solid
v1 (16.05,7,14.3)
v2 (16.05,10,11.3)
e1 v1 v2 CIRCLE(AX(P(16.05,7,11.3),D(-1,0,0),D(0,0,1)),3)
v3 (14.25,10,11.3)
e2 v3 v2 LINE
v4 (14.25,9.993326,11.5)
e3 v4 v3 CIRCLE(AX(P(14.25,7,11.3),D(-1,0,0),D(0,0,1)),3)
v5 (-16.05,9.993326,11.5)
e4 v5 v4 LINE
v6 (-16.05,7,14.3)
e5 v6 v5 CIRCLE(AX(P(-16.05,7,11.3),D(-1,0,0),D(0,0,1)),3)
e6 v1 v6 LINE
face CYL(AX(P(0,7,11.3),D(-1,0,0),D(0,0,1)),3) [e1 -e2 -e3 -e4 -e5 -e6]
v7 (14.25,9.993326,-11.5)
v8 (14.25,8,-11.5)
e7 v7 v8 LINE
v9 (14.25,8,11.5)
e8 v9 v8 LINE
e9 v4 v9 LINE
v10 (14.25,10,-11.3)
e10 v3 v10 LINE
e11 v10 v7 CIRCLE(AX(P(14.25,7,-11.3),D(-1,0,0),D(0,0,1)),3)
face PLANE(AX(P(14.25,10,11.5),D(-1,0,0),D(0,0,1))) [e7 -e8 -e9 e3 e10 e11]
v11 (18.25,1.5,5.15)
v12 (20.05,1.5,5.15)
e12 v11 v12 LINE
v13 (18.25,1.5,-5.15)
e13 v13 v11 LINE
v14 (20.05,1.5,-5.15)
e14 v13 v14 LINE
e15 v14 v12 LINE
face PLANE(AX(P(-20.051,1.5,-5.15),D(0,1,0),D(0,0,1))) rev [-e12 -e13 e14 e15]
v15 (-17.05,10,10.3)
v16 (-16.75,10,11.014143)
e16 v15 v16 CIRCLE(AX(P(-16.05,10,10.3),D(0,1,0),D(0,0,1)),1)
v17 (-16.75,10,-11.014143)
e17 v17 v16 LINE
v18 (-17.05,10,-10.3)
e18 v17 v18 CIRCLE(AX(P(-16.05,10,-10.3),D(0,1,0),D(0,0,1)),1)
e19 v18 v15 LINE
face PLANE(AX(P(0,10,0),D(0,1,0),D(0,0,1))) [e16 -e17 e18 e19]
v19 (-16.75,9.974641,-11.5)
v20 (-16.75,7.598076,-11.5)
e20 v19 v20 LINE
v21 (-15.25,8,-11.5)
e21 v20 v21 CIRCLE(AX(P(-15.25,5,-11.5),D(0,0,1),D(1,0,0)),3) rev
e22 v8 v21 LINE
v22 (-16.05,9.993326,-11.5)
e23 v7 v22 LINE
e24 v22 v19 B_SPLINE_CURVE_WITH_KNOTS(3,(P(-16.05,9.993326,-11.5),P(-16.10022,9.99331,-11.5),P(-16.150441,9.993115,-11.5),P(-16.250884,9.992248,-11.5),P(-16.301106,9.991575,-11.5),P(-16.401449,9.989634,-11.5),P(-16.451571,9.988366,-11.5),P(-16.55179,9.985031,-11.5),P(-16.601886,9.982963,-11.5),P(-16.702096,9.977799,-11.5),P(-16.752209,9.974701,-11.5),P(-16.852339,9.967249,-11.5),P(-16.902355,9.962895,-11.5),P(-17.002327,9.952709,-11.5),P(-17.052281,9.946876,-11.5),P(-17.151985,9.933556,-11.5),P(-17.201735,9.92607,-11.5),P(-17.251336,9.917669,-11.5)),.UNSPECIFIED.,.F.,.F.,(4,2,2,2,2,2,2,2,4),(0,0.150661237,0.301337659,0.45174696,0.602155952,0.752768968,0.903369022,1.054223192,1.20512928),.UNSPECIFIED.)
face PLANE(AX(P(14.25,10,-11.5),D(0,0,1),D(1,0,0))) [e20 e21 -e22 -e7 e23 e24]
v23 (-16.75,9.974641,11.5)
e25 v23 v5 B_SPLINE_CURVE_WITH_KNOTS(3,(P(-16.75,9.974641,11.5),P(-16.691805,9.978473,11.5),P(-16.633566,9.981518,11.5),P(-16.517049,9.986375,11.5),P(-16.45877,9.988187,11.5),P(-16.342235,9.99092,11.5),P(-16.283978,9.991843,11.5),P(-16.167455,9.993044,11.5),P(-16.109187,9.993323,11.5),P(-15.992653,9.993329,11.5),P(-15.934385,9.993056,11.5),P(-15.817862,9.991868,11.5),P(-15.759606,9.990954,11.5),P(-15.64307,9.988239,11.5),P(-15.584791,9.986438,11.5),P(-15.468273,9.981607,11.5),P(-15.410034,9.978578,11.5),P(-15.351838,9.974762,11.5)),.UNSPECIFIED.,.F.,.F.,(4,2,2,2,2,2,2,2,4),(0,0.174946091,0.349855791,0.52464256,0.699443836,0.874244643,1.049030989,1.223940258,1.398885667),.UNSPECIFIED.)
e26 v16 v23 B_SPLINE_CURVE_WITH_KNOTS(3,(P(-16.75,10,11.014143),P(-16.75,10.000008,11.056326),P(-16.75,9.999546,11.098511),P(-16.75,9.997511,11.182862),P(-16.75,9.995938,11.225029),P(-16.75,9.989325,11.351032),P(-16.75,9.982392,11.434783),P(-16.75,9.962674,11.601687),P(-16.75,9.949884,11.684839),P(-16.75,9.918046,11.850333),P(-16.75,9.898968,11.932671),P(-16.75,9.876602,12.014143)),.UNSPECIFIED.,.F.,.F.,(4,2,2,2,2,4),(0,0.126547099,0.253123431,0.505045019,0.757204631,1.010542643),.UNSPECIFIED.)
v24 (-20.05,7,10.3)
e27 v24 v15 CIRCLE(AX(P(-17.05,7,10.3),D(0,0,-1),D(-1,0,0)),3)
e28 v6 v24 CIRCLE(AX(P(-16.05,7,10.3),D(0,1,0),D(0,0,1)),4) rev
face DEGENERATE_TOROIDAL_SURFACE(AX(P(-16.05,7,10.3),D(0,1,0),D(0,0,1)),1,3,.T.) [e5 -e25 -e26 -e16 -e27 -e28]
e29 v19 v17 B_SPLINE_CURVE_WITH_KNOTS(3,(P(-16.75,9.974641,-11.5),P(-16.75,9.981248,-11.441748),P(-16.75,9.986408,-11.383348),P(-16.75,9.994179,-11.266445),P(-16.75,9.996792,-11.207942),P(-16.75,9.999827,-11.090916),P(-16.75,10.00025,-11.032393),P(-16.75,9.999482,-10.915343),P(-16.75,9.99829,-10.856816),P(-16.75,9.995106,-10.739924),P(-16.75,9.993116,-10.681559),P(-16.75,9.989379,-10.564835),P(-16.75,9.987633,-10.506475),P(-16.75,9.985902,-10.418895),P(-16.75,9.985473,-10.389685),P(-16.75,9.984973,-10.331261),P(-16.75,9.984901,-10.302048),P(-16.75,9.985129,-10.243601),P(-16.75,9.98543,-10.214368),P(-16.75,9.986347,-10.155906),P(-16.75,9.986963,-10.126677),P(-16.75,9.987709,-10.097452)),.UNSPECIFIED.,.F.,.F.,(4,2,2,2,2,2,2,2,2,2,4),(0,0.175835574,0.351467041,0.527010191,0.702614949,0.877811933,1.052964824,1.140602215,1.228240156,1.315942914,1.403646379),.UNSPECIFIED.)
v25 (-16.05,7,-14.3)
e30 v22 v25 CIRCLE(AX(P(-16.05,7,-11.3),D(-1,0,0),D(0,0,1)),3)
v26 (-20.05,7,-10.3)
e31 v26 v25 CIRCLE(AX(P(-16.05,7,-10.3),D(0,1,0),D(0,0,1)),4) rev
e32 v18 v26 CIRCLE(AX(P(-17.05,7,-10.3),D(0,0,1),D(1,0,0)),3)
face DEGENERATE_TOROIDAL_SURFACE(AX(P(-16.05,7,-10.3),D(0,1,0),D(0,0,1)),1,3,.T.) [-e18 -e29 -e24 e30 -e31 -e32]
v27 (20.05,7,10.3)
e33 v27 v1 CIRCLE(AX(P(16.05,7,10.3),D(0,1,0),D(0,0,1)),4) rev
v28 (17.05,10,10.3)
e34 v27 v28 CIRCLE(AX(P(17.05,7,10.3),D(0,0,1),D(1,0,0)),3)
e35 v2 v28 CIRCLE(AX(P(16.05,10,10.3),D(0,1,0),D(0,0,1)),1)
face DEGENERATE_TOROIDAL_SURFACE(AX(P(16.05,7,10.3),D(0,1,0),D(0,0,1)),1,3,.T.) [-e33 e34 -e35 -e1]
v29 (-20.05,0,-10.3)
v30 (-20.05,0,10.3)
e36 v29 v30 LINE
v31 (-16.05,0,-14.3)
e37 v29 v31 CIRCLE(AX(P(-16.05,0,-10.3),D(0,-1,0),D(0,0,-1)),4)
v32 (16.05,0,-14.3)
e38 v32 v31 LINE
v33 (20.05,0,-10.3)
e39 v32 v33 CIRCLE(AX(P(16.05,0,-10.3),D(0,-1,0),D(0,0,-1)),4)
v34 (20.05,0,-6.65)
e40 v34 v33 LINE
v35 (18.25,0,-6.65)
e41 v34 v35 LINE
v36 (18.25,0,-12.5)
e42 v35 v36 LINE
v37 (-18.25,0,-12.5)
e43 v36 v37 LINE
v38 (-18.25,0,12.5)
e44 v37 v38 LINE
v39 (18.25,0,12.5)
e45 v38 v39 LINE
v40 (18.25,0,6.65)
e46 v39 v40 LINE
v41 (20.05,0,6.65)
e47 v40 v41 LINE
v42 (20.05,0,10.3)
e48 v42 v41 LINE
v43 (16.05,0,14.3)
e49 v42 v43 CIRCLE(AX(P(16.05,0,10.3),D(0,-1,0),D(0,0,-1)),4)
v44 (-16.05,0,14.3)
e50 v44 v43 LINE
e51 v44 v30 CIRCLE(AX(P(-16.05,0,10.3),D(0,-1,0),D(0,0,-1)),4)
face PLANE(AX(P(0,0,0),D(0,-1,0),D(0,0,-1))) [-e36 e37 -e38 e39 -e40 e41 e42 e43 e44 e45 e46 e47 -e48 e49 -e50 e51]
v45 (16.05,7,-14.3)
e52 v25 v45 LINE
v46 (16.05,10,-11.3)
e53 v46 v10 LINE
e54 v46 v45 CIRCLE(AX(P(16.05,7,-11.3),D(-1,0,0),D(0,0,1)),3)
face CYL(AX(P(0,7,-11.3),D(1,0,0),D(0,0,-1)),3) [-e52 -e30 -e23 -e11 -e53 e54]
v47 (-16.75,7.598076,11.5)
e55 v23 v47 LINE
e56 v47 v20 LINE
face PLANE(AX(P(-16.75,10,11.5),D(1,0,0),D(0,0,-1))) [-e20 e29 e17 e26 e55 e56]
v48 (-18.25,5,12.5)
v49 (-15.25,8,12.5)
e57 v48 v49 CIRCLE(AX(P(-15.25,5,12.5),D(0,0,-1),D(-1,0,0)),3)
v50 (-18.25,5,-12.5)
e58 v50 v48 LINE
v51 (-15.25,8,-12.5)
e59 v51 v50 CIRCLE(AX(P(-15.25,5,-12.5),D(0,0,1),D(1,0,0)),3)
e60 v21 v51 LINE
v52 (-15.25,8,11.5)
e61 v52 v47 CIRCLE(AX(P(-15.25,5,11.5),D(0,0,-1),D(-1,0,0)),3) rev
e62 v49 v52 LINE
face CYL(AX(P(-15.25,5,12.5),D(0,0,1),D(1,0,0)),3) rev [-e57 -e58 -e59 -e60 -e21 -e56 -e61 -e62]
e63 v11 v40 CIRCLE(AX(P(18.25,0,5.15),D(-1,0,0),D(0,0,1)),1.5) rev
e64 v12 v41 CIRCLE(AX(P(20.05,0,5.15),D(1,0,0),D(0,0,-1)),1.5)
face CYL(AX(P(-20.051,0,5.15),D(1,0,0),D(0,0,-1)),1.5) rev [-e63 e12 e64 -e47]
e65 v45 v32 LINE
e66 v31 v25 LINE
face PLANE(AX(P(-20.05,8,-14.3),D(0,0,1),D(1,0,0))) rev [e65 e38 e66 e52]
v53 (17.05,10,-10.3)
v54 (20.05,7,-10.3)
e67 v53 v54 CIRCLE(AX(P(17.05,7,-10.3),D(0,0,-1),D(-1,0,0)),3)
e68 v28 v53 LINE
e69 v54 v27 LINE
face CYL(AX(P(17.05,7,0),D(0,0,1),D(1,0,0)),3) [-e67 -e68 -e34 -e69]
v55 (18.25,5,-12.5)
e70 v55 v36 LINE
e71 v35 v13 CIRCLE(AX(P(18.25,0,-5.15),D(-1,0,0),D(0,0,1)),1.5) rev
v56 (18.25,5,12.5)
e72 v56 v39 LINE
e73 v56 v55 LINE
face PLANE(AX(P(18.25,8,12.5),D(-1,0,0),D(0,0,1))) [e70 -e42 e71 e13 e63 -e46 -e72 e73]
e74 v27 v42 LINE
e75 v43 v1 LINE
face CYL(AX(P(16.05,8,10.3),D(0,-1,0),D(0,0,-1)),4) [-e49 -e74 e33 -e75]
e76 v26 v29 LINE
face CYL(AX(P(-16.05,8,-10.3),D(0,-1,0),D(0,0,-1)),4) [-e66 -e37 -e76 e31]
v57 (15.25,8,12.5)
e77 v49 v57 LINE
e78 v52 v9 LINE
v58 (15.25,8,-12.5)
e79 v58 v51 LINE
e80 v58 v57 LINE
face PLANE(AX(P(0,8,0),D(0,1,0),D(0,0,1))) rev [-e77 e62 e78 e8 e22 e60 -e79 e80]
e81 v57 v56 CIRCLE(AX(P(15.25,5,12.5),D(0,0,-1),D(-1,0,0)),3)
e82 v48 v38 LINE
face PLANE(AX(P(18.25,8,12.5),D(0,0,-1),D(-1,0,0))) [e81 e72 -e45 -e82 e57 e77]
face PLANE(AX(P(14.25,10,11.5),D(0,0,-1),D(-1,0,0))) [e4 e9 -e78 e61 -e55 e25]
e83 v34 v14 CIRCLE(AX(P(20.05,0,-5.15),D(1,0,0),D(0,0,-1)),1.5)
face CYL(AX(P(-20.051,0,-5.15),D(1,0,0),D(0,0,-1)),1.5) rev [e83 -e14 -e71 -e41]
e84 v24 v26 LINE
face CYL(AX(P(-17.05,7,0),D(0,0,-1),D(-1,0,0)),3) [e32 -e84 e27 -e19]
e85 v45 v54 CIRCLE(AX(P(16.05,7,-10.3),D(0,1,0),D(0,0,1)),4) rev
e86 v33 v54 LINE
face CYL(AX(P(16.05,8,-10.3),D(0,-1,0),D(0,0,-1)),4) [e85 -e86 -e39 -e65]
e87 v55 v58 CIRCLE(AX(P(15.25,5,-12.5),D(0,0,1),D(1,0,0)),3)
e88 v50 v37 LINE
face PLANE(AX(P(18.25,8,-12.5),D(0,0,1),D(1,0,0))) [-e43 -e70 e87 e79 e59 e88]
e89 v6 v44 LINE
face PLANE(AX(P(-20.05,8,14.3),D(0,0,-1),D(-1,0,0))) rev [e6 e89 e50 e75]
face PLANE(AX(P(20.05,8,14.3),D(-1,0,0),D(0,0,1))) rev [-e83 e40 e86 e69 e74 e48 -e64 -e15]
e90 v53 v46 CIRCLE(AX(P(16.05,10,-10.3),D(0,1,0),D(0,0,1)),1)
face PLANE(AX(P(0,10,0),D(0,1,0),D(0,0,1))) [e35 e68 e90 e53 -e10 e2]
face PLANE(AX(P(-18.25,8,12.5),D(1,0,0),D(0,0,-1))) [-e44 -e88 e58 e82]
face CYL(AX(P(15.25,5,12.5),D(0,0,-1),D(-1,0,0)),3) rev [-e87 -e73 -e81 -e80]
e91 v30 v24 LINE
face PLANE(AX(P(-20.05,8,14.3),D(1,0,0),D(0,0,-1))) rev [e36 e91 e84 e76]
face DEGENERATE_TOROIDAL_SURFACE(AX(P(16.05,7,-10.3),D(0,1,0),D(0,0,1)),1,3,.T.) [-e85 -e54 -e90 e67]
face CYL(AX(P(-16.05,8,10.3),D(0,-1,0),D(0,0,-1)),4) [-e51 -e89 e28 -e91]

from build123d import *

# Parameters (mm, degrees)
SKETCH1_W           = 40.1
SKETCH1_H           = 28.6
SKETCH1_W_2         = 36.5
SKETCH1_H_2         = 25
BOSS_EXTRUDE1_DEPTH = 8
SKETCH2_W           = 40.1
SKETCH2_H           = 28.6
SKETCH2_W_2         = 31
SKETCH2_H_2         = 23
BOSS_EXTRUDE2_DEPTH = 2
FILLET1_R           = 4
FILLET4_R           = 3
FILLET5_R           = 3
CUT_EXTRUDE1_REACH  = 45.732


with BuildPart() as part:
    # Sketch1 → Boss-Extrude1 (new body)
    with BuildSketch(Plane(origin=(0, 0, 0), x_dir=(1, 0, 0), z_dir=(0, 1, 0))):
        Rectangle(SKETCH1_W, SKETCH1_H)
        Rectangle(SKETCH1_W_2, SKETCH1_H_2, mode=Mode.SUBTRACT)
    extrude(amount=BOSS_EXTRUDE1_DEPTH)

    # Sketch2 → Boss-Extrude2 (add)
    with BuildSketch(Plane(origin=(0, 8, 0), x_dir=(1, 0, 0), z_dir=(0, 1, 0))):
        Rectangle(SKETCH2_W, SKETCH2_H)
        with Locations((-1.25, 0)):
            Rectangle(SKETCH2_W_2, SKETCH2_H_2, mode=Mode.SUBTRACT)
    extrude(amount=BOSS_EXTRUDE2_DEPTH)

    # Fillet1
    fillet1_edges = [part.edges().sort_by_distance(p)[0] for p in [
        (20.05, 5, 14.3),
        (-20.05, 5, 14.3),
        (-20.05, 5, -14.3),
        (20.05, 5, -14.3),
    ]]
    fillet(fillet1_edges, radius=FILLET1_R)

    # Fillet4
    # the kernel refuses this fillet: 3 mm, written as the material it takes off along each edge
    with BuildSketch(Plane(origin=(-20.05, 10, 10.3), x_dir=(1, 0, 0), z_dir=(0, 0, -1)), Plane(origin=(20.05, 10, -10.3), x_dir=(-1, 0, 0), z_dir=(0, 0, 1))) as fillet4_piece_1:
        with BuildLine():
            CenterArc((FILLET4_R, FILLET4_R), FILLET4_R, 180, 90)
            Line((0, FILLET4_R), (0, 0))
            Line((0, 0), (FILLET4_R, 0))
        make_face()
    extrude(amount=20.6, mode=Mode.SUBTRACT)
    with BuildSketch(Plane(origin=(-16.05, 10, -10.3), x_dir=(0, 0, -1), z_dir=(1, 0, 0))) as fillet4_piece_2:
        with BuildLine():
            CenterArc((4 - FILLET4_R, -FILLET4_R), FILLET4_R, 0, 90)
            Line((4, -FILLET4_R), (4, 0))
            Line((4, 0), (4 - FILLET4_R, 0))
        make_face()
    revolve(axis=Axis((-16.05, 10, -10.3), (0, 1, 0)), revolution_arc=90, mode=Mode.SUBTRACT)
    with BuildSketch(Plane(origin=(-16.05, 10, -14.3), x_dir=(0, 0, 1), z_dir=(1, 0, 0))) as fillet4_piece_3:
        with BuildLine():
            CenterArc((FILLET4_R, FILLET4_R), FILLET4_R, 180, 90)
            Line((0, FILLET4_R), (0, 0))
            Line((0, 0), (FILLET4_R, 0))
        make_face()
    extrude(amount=32.1, mode=Mode.SUBTRACT)
    with BuildSketch(Plane(origin=(16.05, 10, -10.3), x_dir=(0, 0, -1), z_dir=(-1, 0, 0))) as fillet4_piece_4:
        with BuildLine():
            CenterArc((4 - FILLET4_R, FILLET4_R), FILLET4_R, 270, 90)
            Line((4, FILLET4_R), (4, 0))
            Line((4, 0), (4 - FILLET4_R, 0))
        make_face()
    revolve(axis=Axis((16.05, 10, -10.3), (0, -1, 0)), revolution_arc=90, mode=Mode.SUBTRACT)
    with BuildSketch(Plane(origin=(16.05, 10, 10.3), x_dir=(0, 0, 1), z_dir=(-1, 0, 0))) as fillet4_piece_5:
        with BuildLine():
            CenterArc((4 - FILLET4_R, -FILLET4_R), FILLET4_R, 360, 90)
            Line((4, -FILLET4_R), (4, 0))
            Line((4, 0), (4 - FILLET4_R, 0))
        make_face()
    revolve(axis=Axis((16.05, 10, 10.3), (0, 1, 0)), revolution_arc=90, mode=Mode.SUBTRACT)
    with BuildSketch(Plane(origin=(16.05, 10, 14.3), x_dir=(0, -1, 0), z_dir=(-1, 0, 0))) as fillet4_piece_6:
        with BuildLine():
            CenterArc((FILLET4_R, -FILLET4_R), FILLET4_R, 90, 90)
            Line((0, -FILLET4_R), (0, 0))
            Line((0, 0), (FILLET4_R, 0))
        make_face()
    extrude(amount=32.1, mode=Mode.SUBTRACT)
    with BuildSketch(Plane(origin=(-16.05, 10, 10.3), x_dir=(0, 0, 1), z_dir=(1, 0, 0))) as fillet4_piece_7:
        with BuildLine():
            CenterArc((4 - FILLET4_R, FILLET4_R), FILLET4_R, 270, 90)
            Line((4, FILLET4_R), (4, 0))
            Line((4, 0), (4 - FILLET4_R, 0))
        make_face()
    revolve(axis=Axis((-16.05, 10, 10.3), (0, -1, 0)), revolution_arc=90, mode=Mode.SUBTRACT)

    # Fillet5
    # the kernel refuses this fillet: 3 mm, written as the material it adds along each edge
    with BuildSketch(Plane(origin=(-18.25, 8, 12.5), x_dir=(0, -1, 0), z_dir=(0, 0, -1))) as fillet5_piece_1_section:
        with BuildLine():
            CenterArc((FILLET5_R, -FILLET5_R), FILLET5_R, 90, 90)
            Line((0, -FILLET5_R), (0, 0))
            Line((0, 0), (FILLET5_R, 0))
        make_face()
    fillet5_piece_1 = extrude(amount=25, mode=Mode.PRIVATE)
    fillet5_piece_1 = split(fillet5_piece_1, bisect_by=Plane(origin=(-16.75, 7.23463982, 12), z_dir=(-1, 0, 0)), keep=Keep.TOP, mode=Mode.PRIVATE)
    fillet5_piece_1 = split(fillet5_piece_1, bisect_by=Plane(origin=(-17.756824707, 7.23463982, 11.5), z_dir=(0, 0, 1)), keep=Keep.TOP, mode=Mode.PRIVATE)
    add(fillet5_piece_1)
    with BuildSketch(Plane(origin=(-18.25, 8, 12.5), x_dir=(0, -1, 0), z_dir=(0, 0, -1))) as fillet5_piece_2_section:
        with BuildLine():
            CenterArc((FILLET5_R, -FILLET5_R), FILLET5_R, 90, 90)
            Line((0, -FILLET5_R), (0, 0))
            Line((0, 0), (FILLET5_R, 0))
        make_face()
    fillet5_piece_2 = extrude(amount=25, mode=Mode.PRIVATE)
    fillet5_piece_2 = split(fillet5_piece_2, bisect_by=Plane(origin=(-16.75, 7.927974855, 12), z_dir=(1, 0, 0)), keep=Keep.TOP, mode=Mode.PRIVATE)
    fillet5_piece_2 = split(fillet5_piece_2, bisect_by=Plane(origin=(-16.260247646, 7.927974855, 11.5), z_dir=(0, 0, 1)), keep=Keep.TOP, mode=Mode.PRIVATE)
    add(fillet5_piece_2)
    with BuildSketch(Plane(origin=(-18.25, 8, 12.5), x_dir=(0, -1, 0), z_dir=(0, 0, -1))) as fillet5_piece_3_section:
        with BuildLine():
            CenterArc((FILLET5_R, -FILLET5_R), FILLET5_R, 90, 90)
            Line((0, -FILLET5_R), (0, 0))
            Line((0, 0), (FILLET5_R, 0))
        make_face()
    fillet5_piece_3 = extrude(amount=25, mode=Mode.PRIVATE)
    fillet5_piece_3 = split(fillet5_piece_3, bisect_by=Plane(origin=(-16.75, 7.23463982, 0), z_dir=(-1, 0, 0)), keep=Keep.TOP, mode=Mode.PRIVATE)
    fillet5_piece_3 = split(fillet5_piece_3, bisect_by=Plane(origin=(-17.756824707, 7.23463982, 11.5), z_dir=(0, 0, -1)), keep=Keep.TOP, mode=Mode.PRIVATE)
    fillet5_piece_3 = split(fillet5_piece_3, bisect_by=Plane(origin=(-17.756824707, 7.23463982, -11.5), z_dir=(0, 0, 1)), keep=Keep.TOP, mode=Mode.PRIVATE)
    add(fillet5_piece_3)
    with BuildSketch(Plane(origin=(-18.25, 8, 12.5), x_dir=(0, -1, 0), z_dir=(0, 0, -1))) as fillet5_piece_4_section:
        with BuildLine():
            CenterArc((FILLET5_R, -FILLET5_R), FILLET5_R, 90, 90)
            Line((0, -FILLET5_R), (0, 0))
            Line((0, 0), (FILLET5_R, 0))
        make_face()
    fillet5_piece_4 = extrude(amount=25, mode=Mode.PRIVATE)
    fillet5_piece_4 = split(fillet5_piece_4, bisect_by=Plane(origin=(-16.75, 7.23463982, -12), z_dir=(-1, 0, 0)), keep=Keep.TOP, mode=Mode.PRIVATE)
    fillet5_piece_4 = split(fillet5_piece_4, bisect_by=Plane(origin=(-17.756824707, 7.23463982, -11.5), z_dir=(0, 0, -1)), keep=Keep.TOP, mode=Mode.PRIVATE)
    add(fillet5_piece_4)
    with BuildSketch(Plane(origin=(-18.25, 8, 12.5), x_dir=(0, -1, 0), z_dir=(0, 0, -1))) as fillet5_piece_5_section:
        with BuildLine():
            CenterArc((FILLET5_R, -FILLET5_R), FILLET5_R, 90, 90)
            Line((0, -FILLET5_R), (0, 0))
            Line((0, 0), (FILLET5_R, 0))
        make_face()
    fillet5_piece_5 = extrude(amount=25, mode=Mode.PRIVATE)
    fillet5_piece_5 = split(fillet5_piece_5, bisect_by=Plane(origin=(-16.75, 7.927974855, -12), z_dir=(1, 0, 0)), keep=Keep.TOP, mode=Mode.PRIVATE)
    fillet5_piece_5 = split(fillet5_piece_5, bisect_by=Plane(origin=(-16.260247646, 7.927974855, -11.5), z_dir=(0, 0, -1)), keep=Keep.TOP, mode=Mode.PRIVATE)
    add(fillet5_piece_5)
    with BuildSketch(Plane(origin=(18.25, 8, -12.5), x_dir=(0, -1, 0), z_dir=(0, 0, 1))) as fillet5_piece_6:
        with BuildLine():
            CenterArc((FILLET5_R, -FILLET5_R), FILLET5_R, 90, 90)
            Line((0, -FILLET5_R), (0, 0))
            Line((0, 0), (FILLET5_R, 0))
        make_face()
    extrude(amount=25)

    # Sketch3 → Cut-Extrude1 (cut, up to next)
    with BuildSketch(Plane(origin=(20.05, 0, 0), x_dir=(0, 0, -1), z_dir=(1, 0, 0)), mode=Mode.PRIVATE) as cut_extrude1_sk1:
        with BuildLine():
            Line((5.15, -1.5), (-5.15, -1.5))
            ThreePointArc((-5.15, -1.5), (-6.65, 0), (-5.15, 1.5))
            Line((-5.15, 1.5), (5.15, 1.5))
            ThreePointArc((5.15, 1.5), (6.65, 0), (5.15, -1.5))
        make_face()
    cut_extrude1_tool1 = extrude(cut_extrude1_sk1.sketch, amount=-CUT_EXTRUDE1_REACH, mode=Mode.PRIVATE) & part.part
    add(cut_extrude1_tool1.solids().sort_by_distance((20.05, 0, 0))[0], mode=Mode.SUBTRACT)


solid = part.part
